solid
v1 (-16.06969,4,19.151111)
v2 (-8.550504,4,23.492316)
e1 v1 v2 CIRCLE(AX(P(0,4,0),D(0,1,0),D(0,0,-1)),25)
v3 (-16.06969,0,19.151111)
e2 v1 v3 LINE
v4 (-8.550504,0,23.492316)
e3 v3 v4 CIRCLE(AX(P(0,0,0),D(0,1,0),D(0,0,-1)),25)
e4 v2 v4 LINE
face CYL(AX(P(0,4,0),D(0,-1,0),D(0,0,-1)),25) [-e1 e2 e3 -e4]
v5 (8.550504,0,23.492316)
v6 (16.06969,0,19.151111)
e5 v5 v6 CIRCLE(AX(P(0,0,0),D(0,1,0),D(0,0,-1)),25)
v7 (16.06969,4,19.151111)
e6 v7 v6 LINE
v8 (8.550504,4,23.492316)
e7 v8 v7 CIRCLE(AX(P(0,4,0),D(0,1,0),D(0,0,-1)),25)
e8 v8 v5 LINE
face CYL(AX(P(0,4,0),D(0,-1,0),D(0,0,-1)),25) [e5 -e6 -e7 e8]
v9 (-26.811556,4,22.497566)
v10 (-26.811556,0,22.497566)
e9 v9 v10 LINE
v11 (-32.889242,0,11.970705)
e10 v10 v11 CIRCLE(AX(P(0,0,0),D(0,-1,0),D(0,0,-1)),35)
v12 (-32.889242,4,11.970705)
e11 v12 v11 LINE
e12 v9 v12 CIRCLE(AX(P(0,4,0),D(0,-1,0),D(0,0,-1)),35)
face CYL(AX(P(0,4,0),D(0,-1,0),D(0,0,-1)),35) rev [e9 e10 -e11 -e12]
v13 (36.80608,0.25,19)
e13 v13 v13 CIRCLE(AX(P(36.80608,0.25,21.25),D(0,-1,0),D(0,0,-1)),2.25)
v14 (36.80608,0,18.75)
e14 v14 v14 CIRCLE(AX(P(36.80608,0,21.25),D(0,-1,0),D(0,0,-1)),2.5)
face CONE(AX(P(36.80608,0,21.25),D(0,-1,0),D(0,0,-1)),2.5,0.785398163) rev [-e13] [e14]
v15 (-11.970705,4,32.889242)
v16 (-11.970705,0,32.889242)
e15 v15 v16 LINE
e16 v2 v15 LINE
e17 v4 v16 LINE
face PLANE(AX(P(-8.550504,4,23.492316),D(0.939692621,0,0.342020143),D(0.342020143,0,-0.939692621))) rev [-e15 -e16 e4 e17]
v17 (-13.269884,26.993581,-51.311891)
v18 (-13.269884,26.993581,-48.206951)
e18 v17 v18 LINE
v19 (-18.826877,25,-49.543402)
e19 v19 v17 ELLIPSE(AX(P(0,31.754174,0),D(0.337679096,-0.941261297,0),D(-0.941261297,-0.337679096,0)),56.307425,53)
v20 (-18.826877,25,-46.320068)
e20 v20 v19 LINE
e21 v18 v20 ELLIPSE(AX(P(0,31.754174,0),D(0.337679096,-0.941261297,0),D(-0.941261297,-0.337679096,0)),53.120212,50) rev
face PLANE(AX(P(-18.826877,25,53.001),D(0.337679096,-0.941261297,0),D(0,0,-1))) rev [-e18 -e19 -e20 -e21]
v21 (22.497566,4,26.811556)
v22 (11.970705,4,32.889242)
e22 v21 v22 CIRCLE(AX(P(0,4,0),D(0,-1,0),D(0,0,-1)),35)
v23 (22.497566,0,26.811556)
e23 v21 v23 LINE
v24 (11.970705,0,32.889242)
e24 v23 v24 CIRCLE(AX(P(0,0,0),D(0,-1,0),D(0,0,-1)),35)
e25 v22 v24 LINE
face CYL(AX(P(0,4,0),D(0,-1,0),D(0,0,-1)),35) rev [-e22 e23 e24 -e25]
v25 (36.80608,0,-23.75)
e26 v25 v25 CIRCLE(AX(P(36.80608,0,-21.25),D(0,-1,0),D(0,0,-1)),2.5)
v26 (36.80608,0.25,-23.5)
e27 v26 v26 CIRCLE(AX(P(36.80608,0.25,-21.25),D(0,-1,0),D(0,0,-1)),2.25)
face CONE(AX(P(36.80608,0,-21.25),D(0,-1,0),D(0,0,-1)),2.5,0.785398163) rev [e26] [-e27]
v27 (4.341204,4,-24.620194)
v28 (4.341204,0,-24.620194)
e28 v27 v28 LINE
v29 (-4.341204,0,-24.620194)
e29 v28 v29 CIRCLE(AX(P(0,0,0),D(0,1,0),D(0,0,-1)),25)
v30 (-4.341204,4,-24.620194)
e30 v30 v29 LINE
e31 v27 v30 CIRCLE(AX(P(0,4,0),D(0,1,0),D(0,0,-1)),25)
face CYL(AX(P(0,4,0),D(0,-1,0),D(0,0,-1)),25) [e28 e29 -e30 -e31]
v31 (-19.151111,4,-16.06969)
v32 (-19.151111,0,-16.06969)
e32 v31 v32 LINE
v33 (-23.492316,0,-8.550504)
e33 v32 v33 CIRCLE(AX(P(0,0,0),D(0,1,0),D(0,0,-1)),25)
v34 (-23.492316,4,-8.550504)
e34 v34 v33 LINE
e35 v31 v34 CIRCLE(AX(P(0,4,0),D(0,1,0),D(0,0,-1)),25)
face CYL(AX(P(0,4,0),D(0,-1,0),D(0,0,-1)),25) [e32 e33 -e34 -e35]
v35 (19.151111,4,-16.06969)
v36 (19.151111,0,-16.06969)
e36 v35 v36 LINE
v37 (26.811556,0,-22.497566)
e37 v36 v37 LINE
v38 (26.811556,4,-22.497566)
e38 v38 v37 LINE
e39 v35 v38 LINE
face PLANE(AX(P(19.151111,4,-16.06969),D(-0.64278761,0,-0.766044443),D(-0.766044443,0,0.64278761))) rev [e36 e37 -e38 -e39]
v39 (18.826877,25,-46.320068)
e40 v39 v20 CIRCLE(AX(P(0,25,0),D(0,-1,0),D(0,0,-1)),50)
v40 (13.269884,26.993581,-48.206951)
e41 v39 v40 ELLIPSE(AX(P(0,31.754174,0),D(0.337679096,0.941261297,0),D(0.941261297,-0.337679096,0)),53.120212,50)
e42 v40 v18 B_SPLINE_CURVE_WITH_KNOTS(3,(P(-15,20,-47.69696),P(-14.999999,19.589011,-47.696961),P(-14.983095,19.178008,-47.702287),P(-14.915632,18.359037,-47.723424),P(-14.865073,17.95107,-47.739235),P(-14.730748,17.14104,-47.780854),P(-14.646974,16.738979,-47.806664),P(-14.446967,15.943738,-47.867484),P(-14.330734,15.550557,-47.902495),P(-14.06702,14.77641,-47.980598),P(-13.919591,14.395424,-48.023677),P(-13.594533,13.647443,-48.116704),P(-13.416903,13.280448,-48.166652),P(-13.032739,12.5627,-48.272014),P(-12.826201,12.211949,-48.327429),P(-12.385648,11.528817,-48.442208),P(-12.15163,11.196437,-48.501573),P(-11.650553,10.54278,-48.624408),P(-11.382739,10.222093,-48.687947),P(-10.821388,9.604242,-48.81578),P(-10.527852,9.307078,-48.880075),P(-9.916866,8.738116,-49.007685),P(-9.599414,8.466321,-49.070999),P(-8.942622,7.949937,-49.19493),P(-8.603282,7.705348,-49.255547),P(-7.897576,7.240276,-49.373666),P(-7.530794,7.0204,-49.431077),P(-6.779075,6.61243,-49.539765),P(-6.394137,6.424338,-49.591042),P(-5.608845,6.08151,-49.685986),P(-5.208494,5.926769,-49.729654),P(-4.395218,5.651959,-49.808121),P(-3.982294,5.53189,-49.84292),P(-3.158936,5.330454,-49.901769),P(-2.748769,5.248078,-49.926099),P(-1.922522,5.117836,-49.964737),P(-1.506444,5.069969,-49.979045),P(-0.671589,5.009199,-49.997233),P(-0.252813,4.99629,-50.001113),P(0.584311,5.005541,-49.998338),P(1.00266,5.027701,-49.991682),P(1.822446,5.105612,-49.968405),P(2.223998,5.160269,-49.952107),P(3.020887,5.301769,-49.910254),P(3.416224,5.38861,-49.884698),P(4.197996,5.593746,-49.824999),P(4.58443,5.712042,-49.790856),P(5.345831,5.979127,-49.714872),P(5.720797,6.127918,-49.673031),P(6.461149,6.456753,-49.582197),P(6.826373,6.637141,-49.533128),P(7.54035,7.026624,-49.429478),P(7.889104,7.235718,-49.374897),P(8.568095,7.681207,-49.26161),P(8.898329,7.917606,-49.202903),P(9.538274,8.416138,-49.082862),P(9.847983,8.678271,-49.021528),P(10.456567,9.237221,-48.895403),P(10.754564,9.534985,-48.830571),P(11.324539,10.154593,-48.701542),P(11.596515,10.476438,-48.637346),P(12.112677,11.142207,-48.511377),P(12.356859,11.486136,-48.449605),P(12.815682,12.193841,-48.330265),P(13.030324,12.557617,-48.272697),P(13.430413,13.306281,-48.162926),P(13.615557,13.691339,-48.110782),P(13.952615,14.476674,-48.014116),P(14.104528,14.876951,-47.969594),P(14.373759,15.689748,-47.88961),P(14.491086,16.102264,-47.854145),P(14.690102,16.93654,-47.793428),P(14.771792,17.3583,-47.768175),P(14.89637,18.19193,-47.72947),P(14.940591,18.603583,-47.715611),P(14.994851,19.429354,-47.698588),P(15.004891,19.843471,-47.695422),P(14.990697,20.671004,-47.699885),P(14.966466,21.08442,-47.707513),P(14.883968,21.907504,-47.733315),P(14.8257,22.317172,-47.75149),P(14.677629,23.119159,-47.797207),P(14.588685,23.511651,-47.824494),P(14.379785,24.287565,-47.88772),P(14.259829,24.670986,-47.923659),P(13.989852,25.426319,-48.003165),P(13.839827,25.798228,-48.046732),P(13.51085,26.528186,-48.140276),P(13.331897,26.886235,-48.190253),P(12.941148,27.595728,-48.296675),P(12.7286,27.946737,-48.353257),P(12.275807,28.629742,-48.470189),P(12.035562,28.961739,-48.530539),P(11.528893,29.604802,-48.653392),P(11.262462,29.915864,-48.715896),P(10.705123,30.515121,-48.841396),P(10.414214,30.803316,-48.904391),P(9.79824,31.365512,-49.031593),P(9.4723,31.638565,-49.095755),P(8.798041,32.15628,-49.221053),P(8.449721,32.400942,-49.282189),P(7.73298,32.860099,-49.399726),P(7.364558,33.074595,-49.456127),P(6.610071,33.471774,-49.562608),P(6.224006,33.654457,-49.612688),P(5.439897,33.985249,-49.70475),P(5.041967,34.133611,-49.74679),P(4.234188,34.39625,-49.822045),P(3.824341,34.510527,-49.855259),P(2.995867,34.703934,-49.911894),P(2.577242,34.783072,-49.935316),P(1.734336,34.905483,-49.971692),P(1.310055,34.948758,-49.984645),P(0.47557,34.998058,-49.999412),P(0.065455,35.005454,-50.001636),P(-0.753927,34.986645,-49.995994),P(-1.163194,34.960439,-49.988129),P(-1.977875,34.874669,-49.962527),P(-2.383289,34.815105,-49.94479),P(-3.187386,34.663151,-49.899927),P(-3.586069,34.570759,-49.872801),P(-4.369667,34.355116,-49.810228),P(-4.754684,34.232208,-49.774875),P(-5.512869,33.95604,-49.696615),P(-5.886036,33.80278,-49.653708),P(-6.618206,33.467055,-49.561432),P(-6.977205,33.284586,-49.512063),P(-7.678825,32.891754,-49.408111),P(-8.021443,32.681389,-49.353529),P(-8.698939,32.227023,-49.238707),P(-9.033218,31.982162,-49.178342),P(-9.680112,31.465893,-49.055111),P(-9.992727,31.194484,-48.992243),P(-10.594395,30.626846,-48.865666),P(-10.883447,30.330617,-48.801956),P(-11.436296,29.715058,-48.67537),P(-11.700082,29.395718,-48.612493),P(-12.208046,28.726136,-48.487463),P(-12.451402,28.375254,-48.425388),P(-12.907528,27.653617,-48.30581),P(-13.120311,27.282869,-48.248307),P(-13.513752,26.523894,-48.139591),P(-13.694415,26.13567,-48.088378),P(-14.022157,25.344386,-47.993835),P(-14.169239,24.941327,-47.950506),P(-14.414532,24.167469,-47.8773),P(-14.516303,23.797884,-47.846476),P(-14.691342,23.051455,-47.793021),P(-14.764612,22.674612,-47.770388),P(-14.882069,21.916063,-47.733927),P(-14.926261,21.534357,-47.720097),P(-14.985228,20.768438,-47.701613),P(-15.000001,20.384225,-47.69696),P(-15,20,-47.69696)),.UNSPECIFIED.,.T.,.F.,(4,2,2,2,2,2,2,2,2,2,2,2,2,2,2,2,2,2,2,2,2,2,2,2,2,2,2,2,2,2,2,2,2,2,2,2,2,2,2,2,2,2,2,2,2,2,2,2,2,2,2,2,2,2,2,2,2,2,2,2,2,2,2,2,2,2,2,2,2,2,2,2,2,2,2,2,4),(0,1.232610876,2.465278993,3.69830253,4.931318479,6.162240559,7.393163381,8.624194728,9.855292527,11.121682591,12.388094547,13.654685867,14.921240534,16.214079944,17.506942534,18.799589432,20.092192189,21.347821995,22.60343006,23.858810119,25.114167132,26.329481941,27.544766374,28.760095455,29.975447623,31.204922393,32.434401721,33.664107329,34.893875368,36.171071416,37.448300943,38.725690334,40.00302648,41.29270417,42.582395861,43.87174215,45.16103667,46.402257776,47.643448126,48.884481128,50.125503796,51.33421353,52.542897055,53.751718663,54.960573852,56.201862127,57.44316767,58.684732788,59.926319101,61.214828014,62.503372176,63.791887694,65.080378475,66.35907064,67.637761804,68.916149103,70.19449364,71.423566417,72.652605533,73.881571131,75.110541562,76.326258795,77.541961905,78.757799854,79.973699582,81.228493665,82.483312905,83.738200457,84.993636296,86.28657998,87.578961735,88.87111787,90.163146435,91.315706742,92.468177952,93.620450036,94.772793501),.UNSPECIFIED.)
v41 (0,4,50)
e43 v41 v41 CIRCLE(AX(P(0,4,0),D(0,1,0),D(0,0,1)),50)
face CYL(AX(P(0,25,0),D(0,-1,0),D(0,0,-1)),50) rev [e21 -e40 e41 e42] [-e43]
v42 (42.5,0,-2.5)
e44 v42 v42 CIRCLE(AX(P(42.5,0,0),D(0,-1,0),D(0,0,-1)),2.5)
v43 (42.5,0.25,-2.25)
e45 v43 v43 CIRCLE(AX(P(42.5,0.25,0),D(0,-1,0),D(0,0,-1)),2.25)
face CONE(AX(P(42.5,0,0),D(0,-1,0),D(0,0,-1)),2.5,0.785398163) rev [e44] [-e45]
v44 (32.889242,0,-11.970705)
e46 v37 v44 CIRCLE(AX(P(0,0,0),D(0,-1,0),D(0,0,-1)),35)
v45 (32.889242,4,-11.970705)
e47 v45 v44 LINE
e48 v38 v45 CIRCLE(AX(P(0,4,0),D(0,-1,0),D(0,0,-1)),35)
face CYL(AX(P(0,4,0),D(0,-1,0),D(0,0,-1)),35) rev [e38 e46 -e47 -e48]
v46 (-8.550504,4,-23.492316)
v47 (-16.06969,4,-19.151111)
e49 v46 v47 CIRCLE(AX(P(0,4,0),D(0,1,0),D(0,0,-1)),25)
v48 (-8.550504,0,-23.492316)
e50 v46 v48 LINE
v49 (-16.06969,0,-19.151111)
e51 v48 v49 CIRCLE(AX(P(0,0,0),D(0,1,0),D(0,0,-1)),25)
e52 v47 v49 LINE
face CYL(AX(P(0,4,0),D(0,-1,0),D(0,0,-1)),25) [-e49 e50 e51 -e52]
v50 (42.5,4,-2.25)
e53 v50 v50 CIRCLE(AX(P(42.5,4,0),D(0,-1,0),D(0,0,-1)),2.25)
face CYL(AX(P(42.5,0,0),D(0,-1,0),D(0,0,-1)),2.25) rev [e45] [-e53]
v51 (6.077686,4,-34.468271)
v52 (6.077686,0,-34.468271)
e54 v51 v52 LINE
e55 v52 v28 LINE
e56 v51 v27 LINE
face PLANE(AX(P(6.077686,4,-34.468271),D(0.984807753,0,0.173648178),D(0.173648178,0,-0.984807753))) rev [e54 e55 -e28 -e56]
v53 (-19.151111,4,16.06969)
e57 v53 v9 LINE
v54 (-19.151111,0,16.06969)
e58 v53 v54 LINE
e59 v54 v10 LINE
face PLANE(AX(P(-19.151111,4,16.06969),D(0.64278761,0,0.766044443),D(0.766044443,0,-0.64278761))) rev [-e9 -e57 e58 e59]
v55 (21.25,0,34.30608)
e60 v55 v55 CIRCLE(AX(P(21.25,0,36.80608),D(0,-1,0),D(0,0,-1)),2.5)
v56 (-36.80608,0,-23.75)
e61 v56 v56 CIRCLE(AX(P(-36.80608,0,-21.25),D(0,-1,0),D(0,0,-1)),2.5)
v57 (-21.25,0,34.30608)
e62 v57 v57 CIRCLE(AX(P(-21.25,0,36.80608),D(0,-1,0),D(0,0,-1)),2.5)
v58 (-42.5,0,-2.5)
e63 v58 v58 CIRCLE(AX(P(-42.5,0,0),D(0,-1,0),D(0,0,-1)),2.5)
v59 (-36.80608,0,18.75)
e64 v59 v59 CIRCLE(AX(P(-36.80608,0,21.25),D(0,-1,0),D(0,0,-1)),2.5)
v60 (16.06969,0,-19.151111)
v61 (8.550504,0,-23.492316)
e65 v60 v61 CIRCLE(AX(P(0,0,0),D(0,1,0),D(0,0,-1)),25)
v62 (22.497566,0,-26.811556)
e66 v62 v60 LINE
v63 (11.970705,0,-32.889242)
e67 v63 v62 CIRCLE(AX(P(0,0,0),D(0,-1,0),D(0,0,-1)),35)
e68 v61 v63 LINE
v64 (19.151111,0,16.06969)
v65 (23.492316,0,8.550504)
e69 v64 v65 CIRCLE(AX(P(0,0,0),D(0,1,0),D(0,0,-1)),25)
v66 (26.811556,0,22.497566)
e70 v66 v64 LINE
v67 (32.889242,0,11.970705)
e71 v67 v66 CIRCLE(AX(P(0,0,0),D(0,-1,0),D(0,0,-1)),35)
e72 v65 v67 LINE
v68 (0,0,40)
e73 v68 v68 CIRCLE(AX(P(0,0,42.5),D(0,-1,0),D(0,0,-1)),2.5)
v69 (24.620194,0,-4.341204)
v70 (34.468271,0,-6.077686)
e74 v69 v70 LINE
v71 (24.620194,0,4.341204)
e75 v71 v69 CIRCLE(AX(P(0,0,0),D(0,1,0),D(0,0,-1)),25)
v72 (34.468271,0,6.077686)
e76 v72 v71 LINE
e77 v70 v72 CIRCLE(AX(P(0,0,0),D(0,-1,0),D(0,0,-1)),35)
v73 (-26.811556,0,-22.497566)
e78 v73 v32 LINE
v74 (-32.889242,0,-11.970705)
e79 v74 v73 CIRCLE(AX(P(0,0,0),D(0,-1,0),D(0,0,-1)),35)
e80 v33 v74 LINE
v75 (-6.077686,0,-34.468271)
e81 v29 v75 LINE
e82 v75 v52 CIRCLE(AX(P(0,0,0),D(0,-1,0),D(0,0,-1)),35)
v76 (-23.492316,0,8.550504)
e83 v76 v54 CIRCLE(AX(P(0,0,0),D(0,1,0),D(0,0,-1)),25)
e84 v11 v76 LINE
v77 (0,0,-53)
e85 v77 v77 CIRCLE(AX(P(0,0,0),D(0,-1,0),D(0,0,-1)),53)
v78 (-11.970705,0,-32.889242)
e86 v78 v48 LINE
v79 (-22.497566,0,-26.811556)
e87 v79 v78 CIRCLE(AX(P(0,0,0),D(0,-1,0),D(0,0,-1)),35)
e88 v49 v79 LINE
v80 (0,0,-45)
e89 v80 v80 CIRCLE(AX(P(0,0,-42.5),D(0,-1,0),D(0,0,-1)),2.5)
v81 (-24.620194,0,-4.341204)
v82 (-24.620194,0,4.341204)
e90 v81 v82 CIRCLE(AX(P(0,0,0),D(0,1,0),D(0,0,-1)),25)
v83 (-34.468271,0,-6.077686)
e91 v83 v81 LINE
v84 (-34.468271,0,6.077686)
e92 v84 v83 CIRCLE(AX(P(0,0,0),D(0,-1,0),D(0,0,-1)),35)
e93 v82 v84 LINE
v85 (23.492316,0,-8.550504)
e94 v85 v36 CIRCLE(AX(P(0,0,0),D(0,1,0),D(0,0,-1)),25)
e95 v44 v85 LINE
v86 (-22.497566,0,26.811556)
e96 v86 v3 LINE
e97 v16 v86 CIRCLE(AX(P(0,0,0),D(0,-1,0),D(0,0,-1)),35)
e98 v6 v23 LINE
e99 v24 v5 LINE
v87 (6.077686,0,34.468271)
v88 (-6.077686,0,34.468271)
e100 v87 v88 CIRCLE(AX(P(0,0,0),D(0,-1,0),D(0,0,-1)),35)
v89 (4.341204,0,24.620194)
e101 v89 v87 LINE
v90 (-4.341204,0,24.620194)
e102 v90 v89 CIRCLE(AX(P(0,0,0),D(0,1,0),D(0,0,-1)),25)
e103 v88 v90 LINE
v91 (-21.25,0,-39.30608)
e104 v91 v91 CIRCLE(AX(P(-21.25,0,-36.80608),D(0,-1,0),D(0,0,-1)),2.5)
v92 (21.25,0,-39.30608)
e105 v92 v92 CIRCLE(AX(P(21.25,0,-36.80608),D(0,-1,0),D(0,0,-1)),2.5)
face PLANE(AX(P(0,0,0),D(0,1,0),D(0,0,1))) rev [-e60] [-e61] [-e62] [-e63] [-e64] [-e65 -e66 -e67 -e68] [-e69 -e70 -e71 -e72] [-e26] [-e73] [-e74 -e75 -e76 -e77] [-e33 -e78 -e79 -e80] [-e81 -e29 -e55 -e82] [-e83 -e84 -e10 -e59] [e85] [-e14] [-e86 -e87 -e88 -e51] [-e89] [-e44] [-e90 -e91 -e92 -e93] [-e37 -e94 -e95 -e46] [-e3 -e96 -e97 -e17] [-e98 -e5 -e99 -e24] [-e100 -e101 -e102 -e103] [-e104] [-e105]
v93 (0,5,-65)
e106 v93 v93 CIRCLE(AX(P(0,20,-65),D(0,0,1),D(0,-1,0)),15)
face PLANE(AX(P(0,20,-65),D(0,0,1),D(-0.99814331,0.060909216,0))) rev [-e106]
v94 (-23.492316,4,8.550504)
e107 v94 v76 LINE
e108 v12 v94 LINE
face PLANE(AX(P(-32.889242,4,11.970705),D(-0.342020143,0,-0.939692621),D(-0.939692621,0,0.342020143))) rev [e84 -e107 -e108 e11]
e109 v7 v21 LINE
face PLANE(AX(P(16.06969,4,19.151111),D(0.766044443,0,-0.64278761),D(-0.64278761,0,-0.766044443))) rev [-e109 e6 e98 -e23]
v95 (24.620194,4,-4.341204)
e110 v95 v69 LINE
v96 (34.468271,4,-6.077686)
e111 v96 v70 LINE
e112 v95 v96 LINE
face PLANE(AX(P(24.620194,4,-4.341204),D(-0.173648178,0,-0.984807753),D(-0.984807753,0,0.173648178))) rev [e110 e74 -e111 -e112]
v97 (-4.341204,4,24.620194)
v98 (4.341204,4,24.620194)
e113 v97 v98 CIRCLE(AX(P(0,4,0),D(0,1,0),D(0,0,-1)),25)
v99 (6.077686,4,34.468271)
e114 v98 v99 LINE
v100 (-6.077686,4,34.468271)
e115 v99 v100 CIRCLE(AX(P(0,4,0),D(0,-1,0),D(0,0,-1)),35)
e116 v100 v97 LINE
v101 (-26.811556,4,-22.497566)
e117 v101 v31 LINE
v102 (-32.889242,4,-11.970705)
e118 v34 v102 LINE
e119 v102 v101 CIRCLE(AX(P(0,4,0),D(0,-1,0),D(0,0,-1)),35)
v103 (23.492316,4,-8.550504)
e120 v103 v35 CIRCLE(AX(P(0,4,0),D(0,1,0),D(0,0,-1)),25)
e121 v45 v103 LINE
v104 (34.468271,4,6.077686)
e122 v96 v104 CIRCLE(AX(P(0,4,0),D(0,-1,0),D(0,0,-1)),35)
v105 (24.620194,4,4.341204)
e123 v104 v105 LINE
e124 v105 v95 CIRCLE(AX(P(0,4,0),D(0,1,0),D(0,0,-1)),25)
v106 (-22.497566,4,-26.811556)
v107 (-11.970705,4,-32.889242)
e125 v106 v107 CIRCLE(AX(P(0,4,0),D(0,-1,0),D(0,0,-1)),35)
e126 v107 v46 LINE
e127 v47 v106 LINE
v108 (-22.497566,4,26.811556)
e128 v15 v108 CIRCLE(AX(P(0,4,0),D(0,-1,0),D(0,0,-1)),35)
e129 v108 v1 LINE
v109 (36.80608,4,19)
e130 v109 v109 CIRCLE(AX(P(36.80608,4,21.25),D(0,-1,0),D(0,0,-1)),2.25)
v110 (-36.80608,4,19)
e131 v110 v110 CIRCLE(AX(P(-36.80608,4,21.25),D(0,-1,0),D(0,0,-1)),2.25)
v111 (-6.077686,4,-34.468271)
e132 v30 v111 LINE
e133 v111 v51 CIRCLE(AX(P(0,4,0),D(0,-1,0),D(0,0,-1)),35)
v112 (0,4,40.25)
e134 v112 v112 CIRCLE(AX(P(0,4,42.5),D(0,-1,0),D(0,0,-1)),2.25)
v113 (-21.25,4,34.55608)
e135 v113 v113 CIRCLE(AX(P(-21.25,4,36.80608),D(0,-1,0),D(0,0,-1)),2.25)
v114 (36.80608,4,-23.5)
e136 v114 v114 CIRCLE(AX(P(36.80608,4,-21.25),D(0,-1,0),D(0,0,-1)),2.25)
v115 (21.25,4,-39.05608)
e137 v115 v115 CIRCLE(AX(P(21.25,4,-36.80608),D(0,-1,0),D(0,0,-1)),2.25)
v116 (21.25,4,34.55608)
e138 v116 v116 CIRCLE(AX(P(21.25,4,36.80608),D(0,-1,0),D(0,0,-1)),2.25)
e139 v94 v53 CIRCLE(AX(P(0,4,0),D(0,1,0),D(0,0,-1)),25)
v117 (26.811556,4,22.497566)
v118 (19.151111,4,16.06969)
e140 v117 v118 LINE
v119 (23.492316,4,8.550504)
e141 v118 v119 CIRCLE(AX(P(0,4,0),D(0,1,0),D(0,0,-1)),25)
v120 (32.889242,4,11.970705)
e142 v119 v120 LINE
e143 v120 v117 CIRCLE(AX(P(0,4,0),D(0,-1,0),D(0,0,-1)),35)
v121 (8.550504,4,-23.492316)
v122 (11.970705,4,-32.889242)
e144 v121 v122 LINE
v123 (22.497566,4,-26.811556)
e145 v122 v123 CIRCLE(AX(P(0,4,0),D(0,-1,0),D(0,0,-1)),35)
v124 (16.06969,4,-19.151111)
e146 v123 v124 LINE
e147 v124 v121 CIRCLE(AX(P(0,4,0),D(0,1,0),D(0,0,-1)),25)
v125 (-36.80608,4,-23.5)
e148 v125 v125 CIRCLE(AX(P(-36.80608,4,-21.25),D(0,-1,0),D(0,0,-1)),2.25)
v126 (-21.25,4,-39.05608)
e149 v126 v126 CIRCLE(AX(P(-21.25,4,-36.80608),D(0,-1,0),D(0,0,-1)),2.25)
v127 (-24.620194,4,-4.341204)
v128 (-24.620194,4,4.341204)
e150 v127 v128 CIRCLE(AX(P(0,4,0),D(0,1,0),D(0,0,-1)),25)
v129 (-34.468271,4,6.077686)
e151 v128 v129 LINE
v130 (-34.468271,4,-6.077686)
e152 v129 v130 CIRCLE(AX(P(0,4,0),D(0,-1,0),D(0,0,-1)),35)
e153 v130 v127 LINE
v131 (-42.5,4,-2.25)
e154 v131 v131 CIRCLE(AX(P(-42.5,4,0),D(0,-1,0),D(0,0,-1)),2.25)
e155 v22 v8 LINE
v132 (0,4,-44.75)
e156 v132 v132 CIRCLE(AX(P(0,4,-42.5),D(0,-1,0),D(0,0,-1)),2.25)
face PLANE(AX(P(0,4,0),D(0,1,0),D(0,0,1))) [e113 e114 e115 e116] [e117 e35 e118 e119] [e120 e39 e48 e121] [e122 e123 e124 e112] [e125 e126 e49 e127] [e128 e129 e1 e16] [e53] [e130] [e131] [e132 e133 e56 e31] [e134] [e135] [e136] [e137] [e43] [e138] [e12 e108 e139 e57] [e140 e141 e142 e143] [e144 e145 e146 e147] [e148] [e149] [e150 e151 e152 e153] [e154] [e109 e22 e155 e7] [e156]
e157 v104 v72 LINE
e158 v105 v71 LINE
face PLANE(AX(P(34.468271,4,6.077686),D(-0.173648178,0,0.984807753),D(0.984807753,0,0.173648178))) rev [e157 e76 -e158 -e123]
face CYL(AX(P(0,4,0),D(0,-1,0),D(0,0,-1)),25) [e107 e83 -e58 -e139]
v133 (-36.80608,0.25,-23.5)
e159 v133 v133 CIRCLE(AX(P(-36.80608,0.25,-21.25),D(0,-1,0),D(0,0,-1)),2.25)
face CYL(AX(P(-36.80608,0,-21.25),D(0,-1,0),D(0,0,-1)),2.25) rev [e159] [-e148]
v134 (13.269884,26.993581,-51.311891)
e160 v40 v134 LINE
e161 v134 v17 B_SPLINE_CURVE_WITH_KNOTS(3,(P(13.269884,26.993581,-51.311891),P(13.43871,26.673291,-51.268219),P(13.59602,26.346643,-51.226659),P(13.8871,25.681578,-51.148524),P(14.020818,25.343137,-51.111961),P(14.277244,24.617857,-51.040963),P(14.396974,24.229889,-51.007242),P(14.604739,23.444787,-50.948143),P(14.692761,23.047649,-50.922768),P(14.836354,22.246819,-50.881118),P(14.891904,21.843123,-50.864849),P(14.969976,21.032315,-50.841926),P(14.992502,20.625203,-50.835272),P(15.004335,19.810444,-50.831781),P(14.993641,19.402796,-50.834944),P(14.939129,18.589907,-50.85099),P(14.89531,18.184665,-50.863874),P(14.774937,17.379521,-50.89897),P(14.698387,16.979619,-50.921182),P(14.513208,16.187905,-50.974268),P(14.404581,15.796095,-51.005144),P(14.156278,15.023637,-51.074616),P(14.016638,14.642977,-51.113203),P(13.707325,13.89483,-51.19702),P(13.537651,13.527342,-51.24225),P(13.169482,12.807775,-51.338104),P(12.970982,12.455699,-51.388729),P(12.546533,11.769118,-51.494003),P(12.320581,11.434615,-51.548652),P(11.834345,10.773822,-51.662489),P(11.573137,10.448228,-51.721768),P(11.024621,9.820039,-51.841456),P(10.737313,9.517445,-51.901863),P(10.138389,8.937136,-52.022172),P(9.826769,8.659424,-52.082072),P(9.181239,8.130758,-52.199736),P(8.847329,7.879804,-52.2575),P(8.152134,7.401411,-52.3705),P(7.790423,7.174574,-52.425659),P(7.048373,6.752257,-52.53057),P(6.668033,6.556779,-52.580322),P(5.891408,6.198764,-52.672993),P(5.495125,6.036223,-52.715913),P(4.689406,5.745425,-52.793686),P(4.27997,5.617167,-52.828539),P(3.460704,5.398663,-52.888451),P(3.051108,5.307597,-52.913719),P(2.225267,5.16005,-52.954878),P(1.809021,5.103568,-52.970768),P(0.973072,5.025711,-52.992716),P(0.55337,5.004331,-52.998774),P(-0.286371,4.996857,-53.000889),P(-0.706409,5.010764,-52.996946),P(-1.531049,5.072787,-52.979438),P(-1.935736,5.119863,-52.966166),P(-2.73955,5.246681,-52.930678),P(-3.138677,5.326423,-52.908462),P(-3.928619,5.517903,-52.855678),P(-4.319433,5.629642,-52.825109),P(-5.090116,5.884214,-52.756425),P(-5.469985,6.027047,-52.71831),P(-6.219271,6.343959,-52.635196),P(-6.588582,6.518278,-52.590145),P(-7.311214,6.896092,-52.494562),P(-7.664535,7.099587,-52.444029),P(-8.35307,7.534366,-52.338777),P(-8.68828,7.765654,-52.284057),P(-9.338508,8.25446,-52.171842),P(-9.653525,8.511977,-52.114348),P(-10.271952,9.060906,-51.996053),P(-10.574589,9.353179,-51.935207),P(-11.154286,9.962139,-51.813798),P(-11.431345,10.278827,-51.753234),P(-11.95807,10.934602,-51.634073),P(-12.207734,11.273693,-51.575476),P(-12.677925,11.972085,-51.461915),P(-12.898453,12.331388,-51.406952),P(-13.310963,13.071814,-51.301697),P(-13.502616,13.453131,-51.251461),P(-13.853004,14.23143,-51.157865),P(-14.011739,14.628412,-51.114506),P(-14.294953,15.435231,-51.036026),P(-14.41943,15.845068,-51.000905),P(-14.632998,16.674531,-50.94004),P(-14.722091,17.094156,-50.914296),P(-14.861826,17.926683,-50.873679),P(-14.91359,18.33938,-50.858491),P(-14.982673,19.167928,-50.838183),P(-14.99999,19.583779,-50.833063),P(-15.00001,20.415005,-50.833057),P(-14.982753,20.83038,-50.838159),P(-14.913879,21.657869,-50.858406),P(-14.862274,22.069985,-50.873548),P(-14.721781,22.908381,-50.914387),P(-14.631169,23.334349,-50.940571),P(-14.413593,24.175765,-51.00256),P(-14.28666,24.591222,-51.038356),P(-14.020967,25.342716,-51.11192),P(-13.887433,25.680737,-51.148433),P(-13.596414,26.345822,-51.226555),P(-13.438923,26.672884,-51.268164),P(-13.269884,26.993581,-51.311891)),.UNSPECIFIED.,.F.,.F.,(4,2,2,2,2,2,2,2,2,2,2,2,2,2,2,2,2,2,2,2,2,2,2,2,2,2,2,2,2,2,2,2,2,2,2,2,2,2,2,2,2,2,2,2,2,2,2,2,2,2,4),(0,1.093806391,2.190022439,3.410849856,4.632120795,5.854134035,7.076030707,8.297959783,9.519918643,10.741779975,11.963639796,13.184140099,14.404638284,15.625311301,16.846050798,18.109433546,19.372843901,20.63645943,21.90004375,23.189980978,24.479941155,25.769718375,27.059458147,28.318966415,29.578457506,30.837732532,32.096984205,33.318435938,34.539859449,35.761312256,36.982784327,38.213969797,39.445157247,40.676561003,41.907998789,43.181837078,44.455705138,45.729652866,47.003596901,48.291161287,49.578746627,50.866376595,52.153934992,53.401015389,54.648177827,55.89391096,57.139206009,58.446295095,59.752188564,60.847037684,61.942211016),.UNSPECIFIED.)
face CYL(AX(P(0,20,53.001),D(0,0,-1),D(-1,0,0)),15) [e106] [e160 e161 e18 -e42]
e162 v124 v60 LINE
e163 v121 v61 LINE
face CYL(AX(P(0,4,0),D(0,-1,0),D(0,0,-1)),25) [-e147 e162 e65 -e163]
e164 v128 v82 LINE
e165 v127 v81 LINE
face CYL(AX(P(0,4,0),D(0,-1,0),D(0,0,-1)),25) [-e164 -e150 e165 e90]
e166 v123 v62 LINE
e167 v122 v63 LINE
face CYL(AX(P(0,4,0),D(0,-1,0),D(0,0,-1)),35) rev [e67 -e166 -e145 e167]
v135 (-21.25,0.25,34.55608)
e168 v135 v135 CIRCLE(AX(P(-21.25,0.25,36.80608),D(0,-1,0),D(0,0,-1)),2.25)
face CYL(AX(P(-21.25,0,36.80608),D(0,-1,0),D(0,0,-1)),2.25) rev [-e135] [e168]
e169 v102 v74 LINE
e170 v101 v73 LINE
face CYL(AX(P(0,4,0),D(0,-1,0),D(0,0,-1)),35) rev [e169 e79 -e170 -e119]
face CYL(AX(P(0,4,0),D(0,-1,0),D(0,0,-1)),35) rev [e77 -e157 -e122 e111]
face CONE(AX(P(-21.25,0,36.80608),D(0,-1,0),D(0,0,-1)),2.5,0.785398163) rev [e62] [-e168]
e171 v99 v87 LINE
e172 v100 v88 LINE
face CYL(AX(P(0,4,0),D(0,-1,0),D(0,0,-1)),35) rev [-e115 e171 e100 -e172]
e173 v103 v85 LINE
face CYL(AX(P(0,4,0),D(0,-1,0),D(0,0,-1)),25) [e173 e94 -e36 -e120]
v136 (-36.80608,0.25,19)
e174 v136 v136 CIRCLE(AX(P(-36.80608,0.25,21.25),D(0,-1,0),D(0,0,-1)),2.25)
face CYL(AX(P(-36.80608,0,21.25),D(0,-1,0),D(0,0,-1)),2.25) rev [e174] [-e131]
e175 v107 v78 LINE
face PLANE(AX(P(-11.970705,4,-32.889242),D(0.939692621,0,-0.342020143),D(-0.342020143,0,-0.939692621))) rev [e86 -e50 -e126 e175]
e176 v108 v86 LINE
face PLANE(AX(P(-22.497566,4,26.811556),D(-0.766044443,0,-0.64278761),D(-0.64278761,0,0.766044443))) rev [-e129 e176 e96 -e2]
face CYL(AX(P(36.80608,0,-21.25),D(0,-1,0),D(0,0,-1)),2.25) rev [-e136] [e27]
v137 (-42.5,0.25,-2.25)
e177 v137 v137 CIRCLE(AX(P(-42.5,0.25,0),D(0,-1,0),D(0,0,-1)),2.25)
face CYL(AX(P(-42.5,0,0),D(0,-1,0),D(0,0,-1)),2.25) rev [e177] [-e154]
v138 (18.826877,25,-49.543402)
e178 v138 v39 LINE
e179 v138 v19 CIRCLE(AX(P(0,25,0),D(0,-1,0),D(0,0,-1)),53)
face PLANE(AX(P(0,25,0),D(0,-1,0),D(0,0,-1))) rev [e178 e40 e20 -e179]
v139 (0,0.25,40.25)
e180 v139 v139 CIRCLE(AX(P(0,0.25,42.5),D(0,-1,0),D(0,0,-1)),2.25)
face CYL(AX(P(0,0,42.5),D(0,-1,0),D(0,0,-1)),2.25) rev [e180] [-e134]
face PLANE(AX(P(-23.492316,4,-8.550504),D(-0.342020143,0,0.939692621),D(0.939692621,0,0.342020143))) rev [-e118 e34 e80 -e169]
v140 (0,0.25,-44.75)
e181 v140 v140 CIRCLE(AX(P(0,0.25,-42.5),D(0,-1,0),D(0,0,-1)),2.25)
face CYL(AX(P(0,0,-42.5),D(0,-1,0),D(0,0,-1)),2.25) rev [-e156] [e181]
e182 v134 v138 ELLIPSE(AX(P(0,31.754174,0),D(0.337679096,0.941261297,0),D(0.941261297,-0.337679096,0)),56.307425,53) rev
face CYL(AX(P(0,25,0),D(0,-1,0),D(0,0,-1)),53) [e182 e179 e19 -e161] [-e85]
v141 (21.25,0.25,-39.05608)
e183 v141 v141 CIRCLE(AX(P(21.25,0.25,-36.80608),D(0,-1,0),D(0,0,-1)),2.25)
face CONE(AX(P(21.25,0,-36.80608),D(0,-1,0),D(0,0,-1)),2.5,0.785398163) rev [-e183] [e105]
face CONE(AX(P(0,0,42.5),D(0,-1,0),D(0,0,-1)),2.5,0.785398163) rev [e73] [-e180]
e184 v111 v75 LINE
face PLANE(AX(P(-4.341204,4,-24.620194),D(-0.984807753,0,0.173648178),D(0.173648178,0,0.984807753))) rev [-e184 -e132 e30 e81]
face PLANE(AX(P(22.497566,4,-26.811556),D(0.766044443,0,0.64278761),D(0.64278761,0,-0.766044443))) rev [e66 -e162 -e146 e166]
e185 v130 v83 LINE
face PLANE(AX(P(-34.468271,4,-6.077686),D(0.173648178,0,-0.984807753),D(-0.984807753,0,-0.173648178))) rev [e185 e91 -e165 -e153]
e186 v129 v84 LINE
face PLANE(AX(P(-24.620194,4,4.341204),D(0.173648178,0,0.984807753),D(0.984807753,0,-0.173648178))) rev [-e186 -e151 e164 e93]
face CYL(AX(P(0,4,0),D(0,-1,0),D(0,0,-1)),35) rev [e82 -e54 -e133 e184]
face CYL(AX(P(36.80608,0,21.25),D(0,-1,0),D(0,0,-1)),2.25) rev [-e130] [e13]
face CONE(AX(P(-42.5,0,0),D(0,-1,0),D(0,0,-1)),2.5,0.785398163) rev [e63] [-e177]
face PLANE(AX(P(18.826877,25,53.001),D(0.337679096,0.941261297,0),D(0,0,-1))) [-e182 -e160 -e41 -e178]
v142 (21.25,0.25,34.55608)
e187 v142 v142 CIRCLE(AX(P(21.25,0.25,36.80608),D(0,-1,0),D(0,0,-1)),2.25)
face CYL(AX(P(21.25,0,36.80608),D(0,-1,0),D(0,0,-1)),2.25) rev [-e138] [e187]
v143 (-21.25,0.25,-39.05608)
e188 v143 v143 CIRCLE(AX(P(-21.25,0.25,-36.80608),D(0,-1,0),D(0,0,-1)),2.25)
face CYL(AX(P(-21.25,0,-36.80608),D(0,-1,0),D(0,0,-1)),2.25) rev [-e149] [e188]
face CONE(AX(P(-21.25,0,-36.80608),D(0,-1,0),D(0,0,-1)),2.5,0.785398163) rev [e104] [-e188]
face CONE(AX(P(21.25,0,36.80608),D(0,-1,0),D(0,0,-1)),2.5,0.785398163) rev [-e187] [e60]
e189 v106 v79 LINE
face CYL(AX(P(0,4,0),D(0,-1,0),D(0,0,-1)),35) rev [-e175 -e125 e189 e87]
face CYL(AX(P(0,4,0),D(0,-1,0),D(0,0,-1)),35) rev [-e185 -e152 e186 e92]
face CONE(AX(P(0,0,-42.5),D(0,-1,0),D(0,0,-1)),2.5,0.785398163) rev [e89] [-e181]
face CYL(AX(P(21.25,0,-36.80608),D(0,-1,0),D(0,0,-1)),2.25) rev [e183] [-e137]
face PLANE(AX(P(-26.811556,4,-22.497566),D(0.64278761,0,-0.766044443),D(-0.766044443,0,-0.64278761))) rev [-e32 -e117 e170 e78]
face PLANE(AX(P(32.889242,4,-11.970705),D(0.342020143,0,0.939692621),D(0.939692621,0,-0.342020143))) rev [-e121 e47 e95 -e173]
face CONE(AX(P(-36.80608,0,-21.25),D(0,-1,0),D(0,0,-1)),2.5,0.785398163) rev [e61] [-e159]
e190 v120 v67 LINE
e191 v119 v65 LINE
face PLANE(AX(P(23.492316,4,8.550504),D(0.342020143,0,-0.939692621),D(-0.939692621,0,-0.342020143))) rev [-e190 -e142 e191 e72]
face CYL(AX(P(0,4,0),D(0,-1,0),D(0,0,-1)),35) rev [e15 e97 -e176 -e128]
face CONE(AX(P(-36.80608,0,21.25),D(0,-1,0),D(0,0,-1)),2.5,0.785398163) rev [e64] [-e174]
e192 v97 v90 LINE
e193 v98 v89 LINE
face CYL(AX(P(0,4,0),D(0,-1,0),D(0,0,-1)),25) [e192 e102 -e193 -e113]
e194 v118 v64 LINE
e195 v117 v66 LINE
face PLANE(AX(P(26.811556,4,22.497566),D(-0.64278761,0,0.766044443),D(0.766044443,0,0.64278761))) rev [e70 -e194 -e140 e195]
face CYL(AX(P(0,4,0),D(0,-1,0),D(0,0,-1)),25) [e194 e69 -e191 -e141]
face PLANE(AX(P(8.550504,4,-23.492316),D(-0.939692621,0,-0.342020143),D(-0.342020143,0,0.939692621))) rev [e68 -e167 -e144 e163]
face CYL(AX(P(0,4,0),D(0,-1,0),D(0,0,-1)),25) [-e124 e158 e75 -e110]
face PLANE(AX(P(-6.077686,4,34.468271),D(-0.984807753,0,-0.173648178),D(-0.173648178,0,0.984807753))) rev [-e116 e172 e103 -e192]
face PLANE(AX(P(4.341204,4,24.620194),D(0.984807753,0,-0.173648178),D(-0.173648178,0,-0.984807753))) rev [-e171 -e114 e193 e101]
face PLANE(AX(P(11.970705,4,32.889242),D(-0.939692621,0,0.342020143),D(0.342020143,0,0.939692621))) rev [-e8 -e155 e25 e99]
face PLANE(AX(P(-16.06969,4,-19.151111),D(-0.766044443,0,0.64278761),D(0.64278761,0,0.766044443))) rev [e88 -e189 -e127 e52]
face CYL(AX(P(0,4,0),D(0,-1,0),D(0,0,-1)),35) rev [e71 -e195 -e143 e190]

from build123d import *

# Parameters (mm, degrees)
SKETCH_1_R                  = 50
EXTRUDE_1_DEPTH             = 4
HOLE_WIZARD_M41_D           = 4.5
HOLE_WIZARD_M41_CSINK_D     = 5
HOLE_WIZARD_M41_CSINK_ANGLE = 90
CUT_EXTRUDE_1_DEPTH         = 71.823724839
SKETCH_5_R                  = 53
SKETCH_5_R_2                = 50
EXTRUDE_2_DEPTH             = 25
EXTRUDE_3_REACH             = 123.12
EXTRUDE_3_END_RADIUS        = 50
SKETCH_6_R                  = 15
EXTRUDE_3_DIRECTION_2_DEPTH = 12


with BuildPart() as part:
    # Эскиз1 → Бобышка-Вытянуть1 (new body)
    with BuildSketch(Plane(origin=(0, 0, 0), x_dir=(1, 0, 0), z_dir=(0, 1, 0))):
        with Locations(Location((0, 0, 0), (0, 0, 270))):
            Circle(SKETCH_1_R)
    extrude(amount=EXTRUDE_1_DEPTH)

    # Отверстие с зазором M41 (through all)
    with Locations(Plane(origin=(0, 0, 0), x_dir=(-1, 0, 0), z_dir=(0, -1, 0))):
        with Locations((-21.25, 36.806079661), (0, 42.5), (21.25, 36.806079661), (36.806079661, 21.25), (42.5, 0), (36.806079661, -21.25), (21.25, -36.806079661), (0, -42.5), (-21.25, -36.806079661), (-36.806079661, -21.25), (-42.5, 0), (-36.806079661, 21.25)):
            CounterSinkHole(HOLE_WIZARD_M41_D / 2, HOLE_WIZARD_M41_CSINK_D / 2, counter_sink_angle=HOLE_WIZARD_M41_CSINK_ANGLE)

    # Эскиз4 → Вырез-Вытянуть1 (cut, through all)
    with BuildSketch(Plane.XZ):
        with BuildLine():
            Line((11.970705016, 32.889241728), (8.550503583, 23.49231552))
            ThreePointArc((8.550503583, 23.49231552), (12.5, 21.650635095), (16.069690242, 19.151111078))
            Line((16.069690242, 19.151111078), (22.497566339, 26.811555509))
            ThreePointArc((22.497566339, 26.811555509), (17.5, 30.310889132), (11.970705016, 32.889241728))
        make_face()
        with BuildLine():
            Line((-6.077686218, 34.468271355), (-4.341204442, 24.620193825))
            ThreePointArc((-4.341204442, 24.620193825), (0, 25), (4.341204442, 24.620193825))
            Line((4.341204442, 24.620193825), (6.077686218, 34.468271355))
            ThreePointArc((6.077686218, 34.468271355), (0, 35), (-6.077686218, 34.468271355))
        make_face()
        with BuildLine():
            Line((32.889241728, -11.970705016), (23.49231552, -8.550503583))
            ThreePointArc((23.49231552, -8.550503583), (21.650635095, -12.5), (19.151111078, -16.069690242))
            Line((19.151111078, -16.069690242), (26.811555509, -22.497566339))
            ThreePointArc((26.811555509, -22.497566339), (30.310889132, -17.5), (32.889241728, -11.970705016))
        make_face()
        with BuildLine():
            Line((34.468271355, 6.077686218), (24.620193825, 4.341204442))
            ThreePointArc((24.620193825, 4.341204442), (25, 0), (24.620193825, -4.341204442))
            Line((24.620193825, -4.341204442), (34.468271355, -6.077686218))
            ThreePointArc((34.468271355, -6.077686218), (35, 0), (34.468271355, 6.077686218))
        make_face()
        with BuildLine():
            Line((26.811555509, 22.497566339), (19.151111078, 16.069690242))
            ThreePointArc((19.151111078, 16.069690242), (21.650635095, 12.5), (23.49231552, 8.550503583))
            Line((23.49231552, 8.550503583), (32.889241728, 11.970705016))
            ThreePointArc((32.889241728, 11.970705016), (30.310889132, 17.5), (26.811555509, 22.497566339))
        make_face()
        with BuildLine():
            Line((-11.970705016, -32.889241728), (-8.550503583, -23.49231552))
            ThreePointArc((-8.550503583, -23.49231552), (-12.5, -21.650635095), (-16.069690242, -19.151111078))
            Line((-16.069690242, -19.151111078), (-22.497566339, -26.811555509))
            ThreePointArc((-22.497566339, -26.811555509), (-17.5, -30.310889132), (-11.970705016, -32.889241728))
        make_face()
        with BuildLine():
            Line((6.077686218, -34.468271355), (4.341204442, -24.620193825))
            ThreePointArc((4.341204442, -24.620193825), (0, -25), (-4.341204442, -24.620193825))
            Line((-4.341204442, -24.620193825), (-6.077686218, -34.468271355))
            ThreePointArc((-6.077686218, -34.468271355), (0, -35), (6.077686218, -34.468271355))
        make_face()
        with BuildLine():
            Line((22.497566339, -26.811555509), (16.069690242, -19.151111078))
            ThreePointArc((16.069690242, -19.151111078), (12.5, -21.650635095), (8.550503583, -23.49231552))
            Line((8.550503583, -23.49231552), (11.970705016, -32.889241728))
            ThreePointArc((11.970705016, -32.889241728), (17.5, -30.310889132), (22.497566339, -26.811555509))
        make_face()
        with BuildLine():
            Line((-22.497566339, 26.811555509), (-16.069690242, 19.151111078))
            ThreePointArc((-16.069690242, 19.151111078), (-12.5, 21.650635095), (-8.550503583, 23.49231552))
            Line((-8.550503583, 23.49231552), (-11.970705016, 32.889241728))
            ThreePointArc((-11.970705016, 32.889241728), (-17.5, 30.310889132), (-22.497566339, 26.811555509))
        make_face()
        with BuildLine():
            Line((-32.889241728, 11.970705016), (-23.49231552, 8.550503583))
            ThreePointArc((-23.49231552, 8.550503583), (-21.650635095, 12.5), (-19.151111078, 16.069690242))
            Line((-19.151111078, 16.069690242), (-26.811555509, 22.497566339))
            ThreePointArc((-26.811555509, 22.497566339), (-30.310889132, 17.5), (-32.889241728, 11.970705016))
        make_face()
        with BuildLine():
            Line((-34.468271355, -6.077686218), (-24.620193825, -4.341204442))
            ThreePointArc((-24.620193825, -4.341204442), (-25, 0), (-24.620193825, 4.341204442))
            Line((-24.620193825, 4.341204442), (-34.468271355, 6.077686218))
            ThreePointArc((-34.468271355, 6.077686218), (-35, 0), (-34.468271355, -6.077686218))
        make_face()
        with BuildLine():
            Line((-26.811555509, -22.497566339), (-19.151111078, -16.069690242))
            ThreePointArc((-19.151111078, -16.069690242), (-21.650635095, -12.5), (-23.49231552, -8.550503583))
            Line((-23.49231552, -8.550503583), (-32.889241728, -11.970705016))
            ThreePointArc((-32.889241728, -11.970705016), (-30.310889132, -17.5), (-26.811555509, -22.497566339))
        make_face()
    extrude(amount=-CUT_EXTRUDE_1_DEPTH, mode=Mode.SUBTRACT)

    # Эскиз5 → Бобышка-Вытянуть2 (add)
    with BuildSketch(Plane.XZ):
        with Locations(Location((0, 0, 0), (0, 0, 270))):
            Circle(SKETCH_5_R)
        with Locations(Location((0, 0, 0), (0, 0, 270))):
            Circle(SKETCH_5_R_2, mode=Mode.SUBTRACT)
    extrude(amount=-EXTRUDE_2_DEPTH)

    # Бобышка-Вытянуть3: up to this cylinder (the profile starts outside it)
    extrude_3_end = Plane(origin=(0, 20, 0), z_dir=(0, -1, 0)) * Cylinder(EXTRUDE_3_END_RADIUS, 347.24, mode=Mode.PRIVATE)
    # Эскиз6 → Бобышка-Вытянуть3 (add, up to the surface)
    with BuildSketch(Plane(origin=(0, 0, -53), x_dir=(-1, 0, 0), z_dir=(0, 0, -1)), mode=Mode.PRIVATE) as extrude_3_sk1:
        with Locations(Location((0, 20, 0), (0, 0, 270))):
            Circle(SKETCH_6_R)
    extrude_3_tool1 = extrude(extrude_3_sk1.sketch, amount=-EXTRUDE_3_REACH, mode=Mode.PRIVATE) - extrude_3_end
    add(extrude_3_tool1.solids().sort_by_distance((0, 20, -53))[0])

    # Эскиз6 → Бобышка-Вытянуть3 direction 2 (add)
    with BuildSketch(Plane(origin=(0, 0, -53), x_dir=(-1, 0, 0), z_dir=(0, 0, -1))):
        with Locations(Location((0, 20, 0), (0, 0, 270))):
            Circle(SKETCH_6_R)
    extrude(amount=EXTRUDE_3_DIRECTION_2_DEPTH)

    # Фаска1
    # the kernel refuses this chamfer: 4.922263446, 3 mm, written as the material it adds along each edge
    with BuildSketch(Plane(origin=(-14.142135624, 25, -35.782012711), x_dir=(0.4567037987045211, 0.8896188173868965, 0), z_dir=(0, 0, -1))) as chamfer_1_piece_1_section:
        with BuildLine():
            Line((2.315673344, 0), (-2.283325225, -4.302139097))
            Line((-2.283325225, -4.302139097), (-2.370903989, -4.257178768))
            ThreePointArc((-2.370903989, -4.257178768), (-1.199667859, -2.121291383), (-0.087578764, 0.044960328))
            Line((-0.087578764, 0.044960328), (0.013196083, 0.097556826))
            ThreePointArc((0.013196083, 0.097556826), (1.157121783, -0.012460261), (2.31461529, 0.098439583))
            Line((2.31461529, 0.098439583), (2.315673344, 0))
        make_face()
    chamfer_1_piece_1 = extrude(amount=27.472660966, mode=Mode.PRIVATE)
    chamfer_1_piece_1 = chamfer_1_piece_1 & Plane(origin=(0, 25.614085428, 0), x_dir=(0, 0, -1), z_dir=(0, -1, 0)) * Cylinder(53, 73, mode=Mode.PRIVATE)
    chamfer_1_piece_1 = chamfer_1_piece_1 - Plane(origin=(0, 25.614085428, 0), x_dir=(0, 0, -1), z_dir=(0, -1, 0)) * Cylinder(50, 73, mode=Mode.PRIVATE)
    add(chamfer_1_piece_1)
    with BuildSketch(Plane(origin=(14.142135624, 25, -35.782012711), x_dir=(-0.45670379870452116, 0.8896188173868965, 0), z_dir=(0, 0, -1))) as chamfer_1_piece_2_section:
        with BuildLine():
            Line((2.315673344, 0), (-2.283325225, 4.302139097))
            Line((-2.283325225, 4.302139097), (-2.370903989, 4.257178768))
            ThreePointArc((-2.370903989, 4.257178768), (-1.199667859, 2.121291383), (-0.087578764, -0.044960328))
            Line((-0.087578764, -0.044960328), (0.013196083, -0.097556826))
            ThreePointArc((0.013196083, -0.097556826), (1.157121783, 0.012460261), (2.31461529, -0.098439583))
            Line((2.31461529, -0.098439583), (2.315673344, 0))
        make_face()
    chamfer_1_piece_2 = extrude(amount=27.472660966, mode=Mode.PRIVATE)
    chamfer_1_piece_2 = chamfer_1_piece_2 & Plane(origin=(0, 25.614085428, 0), x_dir=(0, 0, -1), z_dir=(0, -1, 0)) * Cylinder(53, 73, mode=Mode.PRIVATE)
    chamfer_1_piece_2 = chamfer_1_piece_2 - Plane(origin=(0, 25.614085428, 0), x_dir=(0, 0, -1), z_dir=(0, -1, 0)) * Cylinder(50, 73, mode=Mode.PRIVATE)
    add(chamfer_1_piece_2)


solid = part.part
